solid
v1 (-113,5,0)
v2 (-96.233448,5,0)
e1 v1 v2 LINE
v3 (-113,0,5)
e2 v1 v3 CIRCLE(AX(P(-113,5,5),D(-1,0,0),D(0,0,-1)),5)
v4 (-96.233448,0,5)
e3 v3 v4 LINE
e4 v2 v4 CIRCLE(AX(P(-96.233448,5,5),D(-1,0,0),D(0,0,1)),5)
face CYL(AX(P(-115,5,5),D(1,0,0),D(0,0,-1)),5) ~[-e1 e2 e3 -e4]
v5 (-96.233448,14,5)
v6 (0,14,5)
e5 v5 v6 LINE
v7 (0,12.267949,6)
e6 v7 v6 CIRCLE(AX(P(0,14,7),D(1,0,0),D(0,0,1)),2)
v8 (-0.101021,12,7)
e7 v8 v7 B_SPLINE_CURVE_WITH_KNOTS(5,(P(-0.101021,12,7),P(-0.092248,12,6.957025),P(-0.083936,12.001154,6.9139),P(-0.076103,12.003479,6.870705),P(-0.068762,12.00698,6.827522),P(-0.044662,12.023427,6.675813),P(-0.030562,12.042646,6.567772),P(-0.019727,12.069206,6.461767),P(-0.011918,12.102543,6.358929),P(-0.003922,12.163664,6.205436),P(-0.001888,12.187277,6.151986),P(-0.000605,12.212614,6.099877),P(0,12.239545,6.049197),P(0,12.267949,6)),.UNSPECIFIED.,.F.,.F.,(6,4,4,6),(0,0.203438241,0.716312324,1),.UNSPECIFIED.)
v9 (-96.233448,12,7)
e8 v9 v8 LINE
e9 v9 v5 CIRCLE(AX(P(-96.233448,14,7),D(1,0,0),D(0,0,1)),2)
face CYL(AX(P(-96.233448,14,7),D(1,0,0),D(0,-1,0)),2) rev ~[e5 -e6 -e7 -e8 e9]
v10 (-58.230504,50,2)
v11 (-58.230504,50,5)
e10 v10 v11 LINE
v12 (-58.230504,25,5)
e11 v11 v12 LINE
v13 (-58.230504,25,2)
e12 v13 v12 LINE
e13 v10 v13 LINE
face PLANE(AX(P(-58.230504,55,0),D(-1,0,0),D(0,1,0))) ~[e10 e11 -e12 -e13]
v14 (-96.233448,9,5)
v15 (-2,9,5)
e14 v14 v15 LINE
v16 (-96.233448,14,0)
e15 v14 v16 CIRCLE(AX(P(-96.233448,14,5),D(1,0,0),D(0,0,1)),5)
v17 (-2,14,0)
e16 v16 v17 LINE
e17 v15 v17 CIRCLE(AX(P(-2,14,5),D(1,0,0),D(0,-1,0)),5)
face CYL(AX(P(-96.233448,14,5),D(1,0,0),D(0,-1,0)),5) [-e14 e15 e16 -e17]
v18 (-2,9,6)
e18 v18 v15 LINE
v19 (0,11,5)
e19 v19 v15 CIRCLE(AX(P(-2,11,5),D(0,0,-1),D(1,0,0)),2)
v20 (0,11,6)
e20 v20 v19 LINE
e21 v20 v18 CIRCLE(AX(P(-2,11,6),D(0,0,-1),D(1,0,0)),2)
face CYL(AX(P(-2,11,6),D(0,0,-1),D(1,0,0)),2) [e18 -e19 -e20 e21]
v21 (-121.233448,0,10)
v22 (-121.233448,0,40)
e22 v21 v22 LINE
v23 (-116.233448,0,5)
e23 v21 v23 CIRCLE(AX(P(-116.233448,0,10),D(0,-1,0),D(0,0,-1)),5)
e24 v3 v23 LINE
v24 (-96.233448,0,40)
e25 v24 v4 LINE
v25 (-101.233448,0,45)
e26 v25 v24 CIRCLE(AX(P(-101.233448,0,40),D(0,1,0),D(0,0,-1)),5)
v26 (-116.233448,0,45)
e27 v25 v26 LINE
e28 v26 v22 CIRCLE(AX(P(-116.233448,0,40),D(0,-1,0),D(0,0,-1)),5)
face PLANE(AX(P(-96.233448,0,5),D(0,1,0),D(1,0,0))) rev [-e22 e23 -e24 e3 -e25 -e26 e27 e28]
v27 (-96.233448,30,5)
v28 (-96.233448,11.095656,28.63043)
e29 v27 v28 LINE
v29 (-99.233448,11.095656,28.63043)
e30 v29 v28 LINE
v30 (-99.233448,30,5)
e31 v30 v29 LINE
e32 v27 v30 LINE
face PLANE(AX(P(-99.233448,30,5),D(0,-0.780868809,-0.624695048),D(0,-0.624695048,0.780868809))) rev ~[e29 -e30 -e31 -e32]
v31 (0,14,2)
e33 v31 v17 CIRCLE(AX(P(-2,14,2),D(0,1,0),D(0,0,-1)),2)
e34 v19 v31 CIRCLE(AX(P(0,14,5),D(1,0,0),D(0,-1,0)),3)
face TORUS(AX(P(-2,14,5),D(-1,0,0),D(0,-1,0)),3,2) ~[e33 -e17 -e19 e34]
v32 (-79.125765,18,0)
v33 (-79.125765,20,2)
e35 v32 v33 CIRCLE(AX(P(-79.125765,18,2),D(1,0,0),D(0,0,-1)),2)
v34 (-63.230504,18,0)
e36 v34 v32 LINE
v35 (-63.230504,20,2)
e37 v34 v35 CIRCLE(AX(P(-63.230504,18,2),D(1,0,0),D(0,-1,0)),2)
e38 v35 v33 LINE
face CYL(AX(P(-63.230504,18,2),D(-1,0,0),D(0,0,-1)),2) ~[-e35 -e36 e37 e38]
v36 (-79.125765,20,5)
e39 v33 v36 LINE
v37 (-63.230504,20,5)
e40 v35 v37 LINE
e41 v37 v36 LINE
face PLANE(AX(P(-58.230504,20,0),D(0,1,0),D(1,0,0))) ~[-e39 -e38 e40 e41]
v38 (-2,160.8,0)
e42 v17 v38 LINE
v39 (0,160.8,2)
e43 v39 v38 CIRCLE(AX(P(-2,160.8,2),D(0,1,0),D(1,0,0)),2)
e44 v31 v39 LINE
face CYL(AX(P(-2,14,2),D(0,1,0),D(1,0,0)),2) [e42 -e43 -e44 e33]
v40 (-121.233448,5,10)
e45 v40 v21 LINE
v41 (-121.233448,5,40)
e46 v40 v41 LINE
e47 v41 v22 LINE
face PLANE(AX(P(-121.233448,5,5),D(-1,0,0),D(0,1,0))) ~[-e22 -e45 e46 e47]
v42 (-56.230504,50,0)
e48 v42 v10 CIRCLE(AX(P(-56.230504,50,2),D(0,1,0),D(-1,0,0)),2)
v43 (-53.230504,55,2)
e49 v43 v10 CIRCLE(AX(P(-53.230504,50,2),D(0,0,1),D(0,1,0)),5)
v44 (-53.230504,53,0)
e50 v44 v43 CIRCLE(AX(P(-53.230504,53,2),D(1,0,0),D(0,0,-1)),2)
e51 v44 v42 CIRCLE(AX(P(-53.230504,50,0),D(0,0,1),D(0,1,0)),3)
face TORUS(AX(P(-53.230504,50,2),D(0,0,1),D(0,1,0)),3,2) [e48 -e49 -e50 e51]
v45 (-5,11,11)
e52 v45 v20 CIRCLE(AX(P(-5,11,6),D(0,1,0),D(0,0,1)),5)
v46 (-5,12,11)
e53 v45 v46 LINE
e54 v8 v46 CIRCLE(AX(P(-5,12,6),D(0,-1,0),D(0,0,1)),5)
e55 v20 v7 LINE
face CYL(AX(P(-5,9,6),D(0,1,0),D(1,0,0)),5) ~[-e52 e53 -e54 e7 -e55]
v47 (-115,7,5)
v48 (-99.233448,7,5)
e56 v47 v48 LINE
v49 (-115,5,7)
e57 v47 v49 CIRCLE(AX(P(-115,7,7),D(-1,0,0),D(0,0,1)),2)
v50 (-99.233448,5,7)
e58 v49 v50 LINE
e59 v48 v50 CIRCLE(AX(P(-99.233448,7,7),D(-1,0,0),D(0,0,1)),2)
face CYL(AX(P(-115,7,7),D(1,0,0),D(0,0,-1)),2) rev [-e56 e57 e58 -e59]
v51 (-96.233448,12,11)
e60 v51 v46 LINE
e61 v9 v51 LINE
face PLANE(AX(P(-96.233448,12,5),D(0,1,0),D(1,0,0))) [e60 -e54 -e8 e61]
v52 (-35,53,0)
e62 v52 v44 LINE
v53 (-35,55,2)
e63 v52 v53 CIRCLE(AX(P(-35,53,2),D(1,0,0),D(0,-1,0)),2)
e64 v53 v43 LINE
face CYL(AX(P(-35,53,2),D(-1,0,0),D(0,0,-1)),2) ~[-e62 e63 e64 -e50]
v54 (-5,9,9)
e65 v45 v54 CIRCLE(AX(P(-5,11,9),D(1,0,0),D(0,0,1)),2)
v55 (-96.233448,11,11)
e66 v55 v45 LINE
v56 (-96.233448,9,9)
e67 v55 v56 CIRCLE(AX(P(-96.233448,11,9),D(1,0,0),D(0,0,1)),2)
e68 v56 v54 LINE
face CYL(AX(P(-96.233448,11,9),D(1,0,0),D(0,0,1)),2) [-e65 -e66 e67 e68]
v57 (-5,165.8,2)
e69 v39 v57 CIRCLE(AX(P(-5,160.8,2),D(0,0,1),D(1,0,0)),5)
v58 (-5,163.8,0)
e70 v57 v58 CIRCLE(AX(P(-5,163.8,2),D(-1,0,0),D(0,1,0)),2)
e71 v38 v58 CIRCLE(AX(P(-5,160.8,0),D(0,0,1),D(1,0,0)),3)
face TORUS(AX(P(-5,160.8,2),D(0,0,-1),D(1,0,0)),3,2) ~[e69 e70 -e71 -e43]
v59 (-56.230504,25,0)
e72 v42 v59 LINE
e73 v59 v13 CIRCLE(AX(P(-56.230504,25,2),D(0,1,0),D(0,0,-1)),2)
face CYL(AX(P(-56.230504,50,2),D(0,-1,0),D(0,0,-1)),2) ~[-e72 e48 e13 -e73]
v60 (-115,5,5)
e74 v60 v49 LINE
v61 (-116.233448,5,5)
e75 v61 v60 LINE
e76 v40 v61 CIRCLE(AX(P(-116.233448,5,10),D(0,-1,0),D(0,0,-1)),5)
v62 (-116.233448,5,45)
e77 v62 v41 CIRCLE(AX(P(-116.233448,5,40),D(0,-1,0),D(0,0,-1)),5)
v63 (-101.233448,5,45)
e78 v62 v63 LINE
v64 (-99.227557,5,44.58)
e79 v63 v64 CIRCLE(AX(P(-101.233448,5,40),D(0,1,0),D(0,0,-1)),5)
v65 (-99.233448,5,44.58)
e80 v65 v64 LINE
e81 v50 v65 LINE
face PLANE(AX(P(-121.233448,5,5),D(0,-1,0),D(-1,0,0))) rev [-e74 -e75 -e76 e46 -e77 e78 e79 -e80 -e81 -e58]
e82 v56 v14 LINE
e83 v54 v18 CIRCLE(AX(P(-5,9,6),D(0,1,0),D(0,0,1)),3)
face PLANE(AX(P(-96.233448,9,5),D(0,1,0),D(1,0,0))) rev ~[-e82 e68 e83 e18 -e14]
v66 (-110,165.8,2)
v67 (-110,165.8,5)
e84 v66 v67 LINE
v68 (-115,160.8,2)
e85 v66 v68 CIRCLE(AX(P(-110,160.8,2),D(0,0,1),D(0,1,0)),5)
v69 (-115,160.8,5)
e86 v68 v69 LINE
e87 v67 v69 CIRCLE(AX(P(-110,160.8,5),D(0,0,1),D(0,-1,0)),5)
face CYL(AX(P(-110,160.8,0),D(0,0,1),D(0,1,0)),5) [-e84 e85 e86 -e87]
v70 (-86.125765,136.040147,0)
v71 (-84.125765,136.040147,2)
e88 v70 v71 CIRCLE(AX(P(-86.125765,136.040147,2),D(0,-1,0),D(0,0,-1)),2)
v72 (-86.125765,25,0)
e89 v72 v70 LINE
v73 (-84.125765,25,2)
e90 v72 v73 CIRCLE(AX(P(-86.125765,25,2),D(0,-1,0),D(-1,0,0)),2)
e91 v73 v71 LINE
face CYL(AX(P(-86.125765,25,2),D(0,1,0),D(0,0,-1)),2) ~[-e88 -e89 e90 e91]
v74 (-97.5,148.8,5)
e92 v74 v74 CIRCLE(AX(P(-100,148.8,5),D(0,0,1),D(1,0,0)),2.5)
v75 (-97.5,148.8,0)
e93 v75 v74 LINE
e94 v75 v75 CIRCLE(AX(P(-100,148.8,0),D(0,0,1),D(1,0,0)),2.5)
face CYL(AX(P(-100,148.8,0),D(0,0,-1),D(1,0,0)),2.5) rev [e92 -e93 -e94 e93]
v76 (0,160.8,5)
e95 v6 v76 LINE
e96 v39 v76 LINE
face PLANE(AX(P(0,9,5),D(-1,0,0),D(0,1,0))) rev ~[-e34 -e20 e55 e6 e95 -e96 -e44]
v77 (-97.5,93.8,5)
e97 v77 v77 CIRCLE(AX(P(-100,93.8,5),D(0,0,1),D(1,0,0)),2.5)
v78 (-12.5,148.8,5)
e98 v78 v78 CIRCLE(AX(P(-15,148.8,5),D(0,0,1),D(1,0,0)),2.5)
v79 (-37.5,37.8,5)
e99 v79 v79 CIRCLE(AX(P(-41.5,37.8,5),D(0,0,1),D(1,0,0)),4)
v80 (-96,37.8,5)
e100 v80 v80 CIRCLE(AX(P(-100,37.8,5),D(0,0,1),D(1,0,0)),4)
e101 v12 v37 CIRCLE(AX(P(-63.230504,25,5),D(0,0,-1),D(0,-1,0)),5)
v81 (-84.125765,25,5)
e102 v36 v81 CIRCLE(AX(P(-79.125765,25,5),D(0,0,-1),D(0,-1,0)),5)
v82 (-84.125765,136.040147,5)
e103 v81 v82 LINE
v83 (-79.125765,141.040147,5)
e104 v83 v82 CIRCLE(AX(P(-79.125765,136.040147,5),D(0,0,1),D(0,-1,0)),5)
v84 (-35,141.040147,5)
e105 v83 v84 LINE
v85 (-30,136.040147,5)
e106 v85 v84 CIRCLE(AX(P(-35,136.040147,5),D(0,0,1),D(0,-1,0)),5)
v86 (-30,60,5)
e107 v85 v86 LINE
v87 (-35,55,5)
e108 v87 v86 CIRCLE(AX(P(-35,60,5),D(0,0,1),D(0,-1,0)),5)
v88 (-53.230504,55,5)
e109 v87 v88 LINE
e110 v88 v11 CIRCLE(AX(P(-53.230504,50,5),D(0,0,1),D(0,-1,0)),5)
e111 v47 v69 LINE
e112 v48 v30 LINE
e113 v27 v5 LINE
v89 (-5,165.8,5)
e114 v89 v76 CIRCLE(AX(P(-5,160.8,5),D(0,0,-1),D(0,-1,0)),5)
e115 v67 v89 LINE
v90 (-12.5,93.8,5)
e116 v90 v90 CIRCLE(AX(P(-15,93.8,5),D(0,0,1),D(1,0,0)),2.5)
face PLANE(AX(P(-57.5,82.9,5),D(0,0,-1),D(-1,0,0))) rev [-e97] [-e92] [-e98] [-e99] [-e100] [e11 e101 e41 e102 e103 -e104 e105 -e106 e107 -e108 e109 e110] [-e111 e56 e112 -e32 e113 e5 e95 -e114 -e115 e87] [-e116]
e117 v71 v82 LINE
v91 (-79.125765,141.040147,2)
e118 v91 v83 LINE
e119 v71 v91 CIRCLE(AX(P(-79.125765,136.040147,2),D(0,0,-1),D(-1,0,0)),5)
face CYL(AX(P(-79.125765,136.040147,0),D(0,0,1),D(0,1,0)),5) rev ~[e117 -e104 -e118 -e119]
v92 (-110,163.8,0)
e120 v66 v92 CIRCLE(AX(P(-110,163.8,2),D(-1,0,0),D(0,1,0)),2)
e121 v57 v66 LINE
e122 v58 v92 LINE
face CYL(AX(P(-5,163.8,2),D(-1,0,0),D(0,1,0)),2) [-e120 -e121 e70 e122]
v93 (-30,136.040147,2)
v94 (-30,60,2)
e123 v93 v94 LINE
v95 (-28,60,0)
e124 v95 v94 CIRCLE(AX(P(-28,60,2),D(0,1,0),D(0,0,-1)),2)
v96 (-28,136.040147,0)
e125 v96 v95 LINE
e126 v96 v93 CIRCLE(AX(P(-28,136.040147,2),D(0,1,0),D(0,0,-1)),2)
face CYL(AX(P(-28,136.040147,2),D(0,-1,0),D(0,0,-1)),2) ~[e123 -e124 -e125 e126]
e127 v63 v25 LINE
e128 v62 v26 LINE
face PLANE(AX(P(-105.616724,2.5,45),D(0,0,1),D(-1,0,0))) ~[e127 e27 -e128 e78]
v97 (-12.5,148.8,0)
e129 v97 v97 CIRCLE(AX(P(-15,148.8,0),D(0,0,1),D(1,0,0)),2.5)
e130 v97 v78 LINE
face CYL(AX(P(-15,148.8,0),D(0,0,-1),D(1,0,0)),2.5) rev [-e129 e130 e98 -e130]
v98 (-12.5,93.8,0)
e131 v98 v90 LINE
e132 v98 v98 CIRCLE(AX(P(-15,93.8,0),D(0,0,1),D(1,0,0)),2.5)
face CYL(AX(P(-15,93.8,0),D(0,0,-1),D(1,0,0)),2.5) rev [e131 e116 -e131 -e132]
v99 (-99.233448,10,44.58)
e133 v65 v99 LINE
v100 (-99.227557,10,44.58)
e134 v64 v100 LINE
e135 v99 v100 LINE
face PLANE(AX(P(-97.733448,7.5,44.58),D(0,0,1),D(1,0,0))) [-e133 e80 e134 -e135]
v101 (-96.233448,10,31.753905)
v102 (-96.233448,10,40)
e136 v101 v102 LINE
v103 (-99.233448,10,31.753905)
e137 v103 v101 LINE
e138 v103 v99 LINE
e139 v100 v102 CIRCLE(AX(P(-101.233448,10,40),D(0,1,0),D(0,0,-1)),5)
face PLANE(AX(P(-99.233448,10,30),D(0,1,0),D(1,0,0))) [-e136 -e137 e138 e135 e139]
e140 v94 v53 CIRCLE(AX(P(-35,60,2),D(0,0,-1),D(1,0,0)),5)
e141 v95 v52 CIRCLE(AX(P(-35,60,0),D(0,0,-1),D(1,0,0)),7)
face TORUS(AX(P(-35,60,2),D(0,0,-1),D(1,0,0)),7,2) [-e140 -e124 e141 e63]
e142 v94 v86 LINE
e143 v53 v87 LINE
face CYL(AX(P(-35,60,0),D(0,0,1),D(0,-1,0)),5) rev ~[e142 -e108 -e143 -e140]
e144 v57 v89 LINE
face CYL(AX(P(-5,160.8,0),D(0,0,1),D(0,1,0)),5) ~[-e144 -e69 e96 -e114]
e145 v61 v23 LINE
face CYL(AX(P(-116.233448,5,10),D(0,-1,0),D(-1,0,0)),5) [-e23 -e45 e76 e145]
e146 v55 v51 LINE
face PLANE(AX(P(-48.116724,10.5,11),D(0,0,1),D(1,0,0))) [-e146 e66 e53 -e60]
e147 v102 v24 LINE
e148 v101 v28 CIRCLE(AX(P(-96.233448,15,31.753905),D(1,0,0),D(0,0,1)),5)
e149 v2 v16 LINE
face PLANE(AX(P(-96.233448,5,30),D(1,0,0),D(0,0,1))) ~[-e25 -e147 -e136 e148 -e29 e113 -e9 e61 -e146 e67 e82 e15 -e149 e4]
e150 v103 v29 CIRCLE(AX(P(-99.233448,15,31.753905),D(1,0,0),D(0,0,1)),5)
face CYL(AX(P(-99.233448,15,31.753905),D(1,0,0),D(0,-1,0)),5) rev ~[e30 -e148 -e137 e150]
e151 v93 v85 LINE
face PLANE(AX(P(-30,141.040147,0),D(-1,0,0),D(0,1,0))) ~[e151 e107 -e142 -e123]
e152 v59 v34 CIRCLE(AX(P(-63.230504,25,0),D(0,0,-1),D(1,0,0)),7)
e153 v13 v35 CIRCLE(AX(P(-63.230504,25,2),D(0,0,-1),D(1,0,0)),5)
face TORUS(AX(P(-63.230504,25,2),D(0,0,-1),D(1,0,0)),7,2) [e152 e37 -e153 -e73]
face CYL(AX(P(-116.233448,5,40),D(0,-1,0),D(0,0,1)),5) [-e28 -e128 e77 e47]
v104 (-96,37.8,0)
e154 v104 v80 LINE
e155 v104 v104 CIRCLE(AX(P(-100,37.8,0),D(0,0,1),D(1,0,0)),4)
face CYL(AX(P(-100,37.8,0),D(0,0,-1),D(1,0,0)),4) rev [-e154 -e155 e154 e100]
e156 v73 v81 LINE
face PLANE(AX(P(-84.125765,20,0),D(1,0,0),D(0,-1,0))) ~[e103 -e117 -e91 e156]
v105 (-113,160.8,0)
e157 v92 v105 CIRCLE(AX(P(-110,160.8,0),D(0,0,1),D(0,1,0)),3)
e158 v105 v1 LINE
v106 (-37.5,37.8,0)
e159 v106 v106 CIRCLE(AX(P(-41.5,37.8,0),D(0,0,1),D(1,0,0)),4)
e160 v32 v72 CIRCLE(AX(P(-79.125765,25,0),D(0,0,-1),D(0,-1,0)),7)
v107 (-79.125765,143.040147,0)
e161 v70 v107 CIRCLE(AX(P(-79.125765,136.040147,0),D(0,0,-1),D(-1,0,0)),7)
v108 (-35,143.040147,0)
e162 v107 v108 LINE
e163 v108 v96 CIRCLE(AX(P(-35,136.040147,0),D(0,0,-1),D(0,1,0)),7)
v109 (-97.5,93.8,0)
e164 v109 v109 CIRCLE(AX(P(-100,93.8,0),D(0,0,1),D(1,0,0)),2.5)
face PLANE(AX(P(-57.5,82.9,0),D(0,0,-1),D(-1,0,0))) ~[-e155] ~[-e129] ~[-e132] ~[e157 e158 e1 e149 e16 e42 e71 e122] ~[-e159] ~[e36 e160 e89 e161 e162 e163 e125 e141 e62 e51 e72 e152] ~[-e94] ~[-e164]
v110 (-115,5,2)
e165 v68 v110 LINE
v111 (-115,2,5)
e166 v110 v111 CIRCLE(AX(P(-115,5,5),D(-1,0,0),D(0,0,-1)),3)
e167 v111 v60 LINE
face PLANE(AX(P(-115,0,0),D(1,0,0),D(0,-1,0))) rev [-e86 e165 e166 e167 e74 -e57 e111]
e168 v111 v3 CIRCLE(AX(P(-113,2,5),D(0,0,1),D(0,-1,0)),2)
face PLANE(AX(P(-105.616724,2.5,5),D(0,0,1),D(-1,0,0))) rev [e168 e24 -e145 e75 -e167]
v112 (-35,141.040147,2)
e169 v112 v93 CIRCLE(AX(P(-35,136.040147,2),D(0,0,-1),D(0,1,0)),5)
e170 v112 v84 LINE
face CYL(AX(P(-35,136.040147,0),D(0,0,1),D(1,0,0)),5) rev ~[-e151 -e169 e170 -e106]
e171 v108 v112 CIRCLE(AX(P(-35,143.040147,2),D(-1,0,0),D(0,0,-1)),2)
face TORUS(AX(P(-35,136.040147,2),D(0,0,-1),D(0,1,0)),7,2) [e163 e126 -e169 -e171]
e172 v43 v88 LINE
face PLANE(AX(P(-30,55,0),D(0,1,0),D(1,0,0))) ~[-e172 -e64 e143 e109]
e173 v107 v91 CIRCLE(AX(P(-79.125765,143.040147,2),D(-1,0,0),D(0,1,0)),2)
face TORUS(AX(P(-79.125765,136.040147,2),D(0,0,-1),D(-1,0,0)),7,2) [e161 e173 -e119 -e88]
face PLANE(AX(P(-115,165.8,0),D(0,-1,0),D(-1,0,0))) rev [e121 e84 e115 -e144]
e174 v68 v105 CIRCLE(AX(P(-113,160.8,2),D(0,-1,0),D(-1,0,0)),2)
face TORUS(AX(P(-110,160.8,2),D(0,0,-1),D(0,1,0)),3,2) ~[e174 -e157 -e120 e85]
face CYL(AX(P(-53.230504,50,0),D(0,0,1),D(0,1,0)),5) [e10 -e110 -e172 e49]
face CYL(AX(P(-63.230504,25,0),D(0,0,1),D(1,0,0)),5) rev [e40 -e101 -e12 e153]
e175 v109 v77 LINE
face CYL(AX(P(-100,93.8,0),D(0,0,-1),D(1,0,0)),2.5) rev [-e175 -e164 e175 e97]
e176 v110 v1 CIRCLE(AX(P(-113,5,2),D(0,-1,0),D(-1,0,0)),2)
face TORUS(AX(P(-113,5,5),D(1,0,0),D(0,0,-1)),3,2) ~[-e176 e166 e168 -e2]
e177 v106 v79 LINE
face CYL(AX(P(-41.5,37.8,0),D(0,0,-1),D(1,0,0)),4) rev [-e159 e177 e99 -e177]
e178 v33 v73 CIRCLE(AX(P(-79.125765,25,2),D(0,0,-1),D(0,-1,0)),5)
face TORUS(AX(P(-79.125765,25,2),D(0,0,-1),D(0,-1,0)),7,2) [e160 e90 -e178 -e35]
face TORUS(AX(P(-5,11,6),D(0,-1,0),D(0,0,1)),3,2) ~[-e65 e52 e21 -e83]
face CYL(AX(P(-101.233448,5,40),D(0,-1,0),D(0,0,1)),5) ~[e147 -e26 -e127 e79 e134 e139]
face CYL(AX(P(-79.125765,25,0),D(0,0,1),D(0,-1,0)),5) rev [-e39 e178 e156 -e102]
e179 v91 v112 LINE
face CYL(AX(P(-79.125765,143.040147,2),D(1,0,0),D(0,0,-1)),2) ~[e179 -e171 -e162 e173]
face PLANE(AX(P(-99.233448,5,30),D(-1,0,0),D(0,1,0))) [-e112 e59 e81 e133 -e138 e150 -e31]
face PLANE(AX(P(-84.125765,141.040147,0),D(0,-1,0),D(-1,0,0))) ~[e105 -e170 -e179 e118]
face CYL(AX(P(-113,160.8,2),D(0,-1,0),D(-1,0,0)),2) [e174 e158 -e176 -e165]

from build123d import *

# Parameters (mm, degrees)
F0_W      = 115
F0_H      = 165.8
F0_R      = 4
F0_R_2    = 2.5
F1_DEPTH  = 5
F2_W      = 18.7665516138
F2_H      = 5
F2_W_2    = 6.2334483862
F3_DEPTH  = 40
F4_W      = 3
F4_H      = 25
F5_DEPTH  = 25
F9_W      = 3
F9_H      = 5
F10_DEPTH = 14.58
F12_DEPTH = 3
F13_W     = 96.2334483862
F13_H     = 9
F14_DEPTH = 5
F15_W     = 96.2334483862
F15_H     = 3
F16_DEPTH = 6
F17_R     = 5
F18_R     = 2


with BuildPart() as f1:
    # F0 (on Top) → F1 (new body)
    with BuildSketch(Plane.XY):
        with Locations((-57.5, 82.9)):
            Rectangle(F0_W, F0_H)
        with Locations((-100, 37.8)):
            Circle(F0_R, mode=Mode.SUBTRACT)
        with Locations((-41.5, 37.8)):
            Circle(F0_R, mode=Mode.SUBTRACT)
        Polygon((-84.125764668, 141.0401467979), (-30, 141.0401467979), (-30, 55), (-58.2305043936, 55), (-58.2305043936, 20), (-84.125764668, 20), align=None, mode=Mode.SUBTRACT)
        with Locations((-100, 93.8)):
            Circle(F0_R_2, mode=Mode.SUBTRACT)
        with Locations((-100, 148.8)):
            Circle(F0_R_2, mode=Mode.SUBTRACT)
        with Locations((-15, 93.8)):
            Circle(F0_R_2, mode=Mode.SUBTRACT)
        with Locations((-15, 148.8)):
            Circle(F0_R_2, mode=Mode.SUBTRACT)
    extrude(amount=-F1_DEPTH)

    # F2 (on face) → F3 (join)
    with BuildSketch(Plane(origin=(0, 0, -5), x_dir=(1, 0, 0), z_dir=(0, 0, -1))):
        with Locations((-105.6167241931, -2.5)):
            Rectangle(F2_W, F2_H)
        with Locations((-118.1167241931, -2.5)):
            Rectangle(F2_W_2, F2_H)
    extrude(amount=F3_DEPTH)

    # F4 (on face) → F5 (join)
    with BuildSketch(Plane(origin=(0, 5, 0), x_dir=(-1, 0, 0), z_dir=(0, 1, 0))):
        with Locations((97.7334483862, -17.5)):
            Rectangle(F4_W, F4_H)
    extrude(amount=F5_DEPTH)


with BuildPart() as f7_1:
    # F7: instance of F1
    add(f1.part.mirror(Plane.XY))

    # F9 (on face) → F10 (join)
    with BuildSketch(Plane.XY.offset(30)):
        with Locations((-97.7334483862, 7.5)):
            Rectangle(F9_W, F9_H)
    extrude(amount=F10_DEPTH)

    # F11 (on face) → F12 (cut, through all)
    with BuildSketch(Plane(origin=(-99.2334483862, 0, 0), x_dir=(0, -1, 0), z_dir=(-1, 0, 0))):
        Polygon((-30, 30), (-30, 5), (-10, 30), align=None)
    extrude(amount=-F12_DEPTH, mode=Mode.SUBTRACT)

    # F13 (on face) → F14 (cut, through all)
    with BuildSketch(Plane.XY.offset(5)):
        with Locations((-48.1167241931, 4.5)):
            Rectangle(F13_W, F13_H)
    extrude(amount=-F14_DEPTH, mode=Mode.SUBTRACT)

    # F15 (on face) → F16 (join)
    with BuildSketch(Plane.XY.offset(5)):
        with Locations((-48.1167241931, 10.5)):
            Rectangle(F15_W, F15_H)
    extrude(amount=F16_DEPTH)

    # F17
    f17_edges = [f7_1.edges().sort_by_distance(p)[0] for p in [
        (-97.733448, 10, 30),
        (-105.616724, 0, 0),
        (-96.233448, 2.5, 45),
        (-121.233448, 2.5, 45),
        (-121.233448, 2.5, 5),
        (-115, 165.8, 2.5),
        (0, 165.8, 2.5),
        (0, 10.5, 11),
        (-58.230504, 55, 2.5),
        (-30, 55, 2.5),
        (-58.230504, 20, 2.5),
        (-84.125765, 20, 2.5),
        (-30, 141.040147, 2.5),
        (-84.125765, 141.040147, 2.5),
        (-48.116724, 9, 0),
    ]]
    fillet(f17_edges, radius=F17_R)

    # F18 (call 1 of 4: OpenCascade refuses the feature's edges together)
    f18_edges = [f7_1.edges().sort_by_distance(p)[0] for p in [
        (-48.116724, 12, 5),
    ]]
    fillet(f18_edges, radius=F18_R)

    # F18#2 (call 2 of 4)
    f18_2_edges = [f7_1.edges().sort_by_distance(p)[0] for p in [
        (-107.116724, 5, 5),
    ]]
    fillet(f18_2_edges, radius=F18_R)

    # F18#3 (call 3 of 4)
    f18_3_edges = [f7_1.edges().sort_by_distance(p)[0] for p in [
        (0, 87.4, 0),
        (-115, 1.464466, 1.464466),
        (-115, 82.9, 0),
        (-113.535534, 164.335534, 0),
        (-57.5, 165.8, 0),
        (-1.464466, 164.335534, 0),
        (-50.616724, 9, 11),
        (0, 9, 5.5),
        (-1.464466, 9, 9.535534),
        (0, 10.464466, 1.464466),
    ]]
    fillet(f18_3_edges, radius=F18_R)

    # F18#4 (call 4 of 4)
    f18_4_edges = [f7_1.edges().sort_by_distance(p)[0] for p in [
        (-30, 98.020073, 0),
        (-57.062882, 141.040147, 0),
        (-82.661299, 139.575681, 0),
        (-31.464466, 139.575681, 0),
        (-84.125765, 80.520073, 0),
        (-82.661299, 21.464466, 0),
        (-31.464466, 56.464466, 0),
        (-71.178135, 20, 0),
        (-44.115252, 55, 0),
        (-59.69497, 21.464466, 0),
        (-56.766038, 53.535534, 0),
        (-58.230504, 37.5, 0),
    ]]
    fillet(f18_4_edges, radius=F18_R)


solid = f7_1.part
